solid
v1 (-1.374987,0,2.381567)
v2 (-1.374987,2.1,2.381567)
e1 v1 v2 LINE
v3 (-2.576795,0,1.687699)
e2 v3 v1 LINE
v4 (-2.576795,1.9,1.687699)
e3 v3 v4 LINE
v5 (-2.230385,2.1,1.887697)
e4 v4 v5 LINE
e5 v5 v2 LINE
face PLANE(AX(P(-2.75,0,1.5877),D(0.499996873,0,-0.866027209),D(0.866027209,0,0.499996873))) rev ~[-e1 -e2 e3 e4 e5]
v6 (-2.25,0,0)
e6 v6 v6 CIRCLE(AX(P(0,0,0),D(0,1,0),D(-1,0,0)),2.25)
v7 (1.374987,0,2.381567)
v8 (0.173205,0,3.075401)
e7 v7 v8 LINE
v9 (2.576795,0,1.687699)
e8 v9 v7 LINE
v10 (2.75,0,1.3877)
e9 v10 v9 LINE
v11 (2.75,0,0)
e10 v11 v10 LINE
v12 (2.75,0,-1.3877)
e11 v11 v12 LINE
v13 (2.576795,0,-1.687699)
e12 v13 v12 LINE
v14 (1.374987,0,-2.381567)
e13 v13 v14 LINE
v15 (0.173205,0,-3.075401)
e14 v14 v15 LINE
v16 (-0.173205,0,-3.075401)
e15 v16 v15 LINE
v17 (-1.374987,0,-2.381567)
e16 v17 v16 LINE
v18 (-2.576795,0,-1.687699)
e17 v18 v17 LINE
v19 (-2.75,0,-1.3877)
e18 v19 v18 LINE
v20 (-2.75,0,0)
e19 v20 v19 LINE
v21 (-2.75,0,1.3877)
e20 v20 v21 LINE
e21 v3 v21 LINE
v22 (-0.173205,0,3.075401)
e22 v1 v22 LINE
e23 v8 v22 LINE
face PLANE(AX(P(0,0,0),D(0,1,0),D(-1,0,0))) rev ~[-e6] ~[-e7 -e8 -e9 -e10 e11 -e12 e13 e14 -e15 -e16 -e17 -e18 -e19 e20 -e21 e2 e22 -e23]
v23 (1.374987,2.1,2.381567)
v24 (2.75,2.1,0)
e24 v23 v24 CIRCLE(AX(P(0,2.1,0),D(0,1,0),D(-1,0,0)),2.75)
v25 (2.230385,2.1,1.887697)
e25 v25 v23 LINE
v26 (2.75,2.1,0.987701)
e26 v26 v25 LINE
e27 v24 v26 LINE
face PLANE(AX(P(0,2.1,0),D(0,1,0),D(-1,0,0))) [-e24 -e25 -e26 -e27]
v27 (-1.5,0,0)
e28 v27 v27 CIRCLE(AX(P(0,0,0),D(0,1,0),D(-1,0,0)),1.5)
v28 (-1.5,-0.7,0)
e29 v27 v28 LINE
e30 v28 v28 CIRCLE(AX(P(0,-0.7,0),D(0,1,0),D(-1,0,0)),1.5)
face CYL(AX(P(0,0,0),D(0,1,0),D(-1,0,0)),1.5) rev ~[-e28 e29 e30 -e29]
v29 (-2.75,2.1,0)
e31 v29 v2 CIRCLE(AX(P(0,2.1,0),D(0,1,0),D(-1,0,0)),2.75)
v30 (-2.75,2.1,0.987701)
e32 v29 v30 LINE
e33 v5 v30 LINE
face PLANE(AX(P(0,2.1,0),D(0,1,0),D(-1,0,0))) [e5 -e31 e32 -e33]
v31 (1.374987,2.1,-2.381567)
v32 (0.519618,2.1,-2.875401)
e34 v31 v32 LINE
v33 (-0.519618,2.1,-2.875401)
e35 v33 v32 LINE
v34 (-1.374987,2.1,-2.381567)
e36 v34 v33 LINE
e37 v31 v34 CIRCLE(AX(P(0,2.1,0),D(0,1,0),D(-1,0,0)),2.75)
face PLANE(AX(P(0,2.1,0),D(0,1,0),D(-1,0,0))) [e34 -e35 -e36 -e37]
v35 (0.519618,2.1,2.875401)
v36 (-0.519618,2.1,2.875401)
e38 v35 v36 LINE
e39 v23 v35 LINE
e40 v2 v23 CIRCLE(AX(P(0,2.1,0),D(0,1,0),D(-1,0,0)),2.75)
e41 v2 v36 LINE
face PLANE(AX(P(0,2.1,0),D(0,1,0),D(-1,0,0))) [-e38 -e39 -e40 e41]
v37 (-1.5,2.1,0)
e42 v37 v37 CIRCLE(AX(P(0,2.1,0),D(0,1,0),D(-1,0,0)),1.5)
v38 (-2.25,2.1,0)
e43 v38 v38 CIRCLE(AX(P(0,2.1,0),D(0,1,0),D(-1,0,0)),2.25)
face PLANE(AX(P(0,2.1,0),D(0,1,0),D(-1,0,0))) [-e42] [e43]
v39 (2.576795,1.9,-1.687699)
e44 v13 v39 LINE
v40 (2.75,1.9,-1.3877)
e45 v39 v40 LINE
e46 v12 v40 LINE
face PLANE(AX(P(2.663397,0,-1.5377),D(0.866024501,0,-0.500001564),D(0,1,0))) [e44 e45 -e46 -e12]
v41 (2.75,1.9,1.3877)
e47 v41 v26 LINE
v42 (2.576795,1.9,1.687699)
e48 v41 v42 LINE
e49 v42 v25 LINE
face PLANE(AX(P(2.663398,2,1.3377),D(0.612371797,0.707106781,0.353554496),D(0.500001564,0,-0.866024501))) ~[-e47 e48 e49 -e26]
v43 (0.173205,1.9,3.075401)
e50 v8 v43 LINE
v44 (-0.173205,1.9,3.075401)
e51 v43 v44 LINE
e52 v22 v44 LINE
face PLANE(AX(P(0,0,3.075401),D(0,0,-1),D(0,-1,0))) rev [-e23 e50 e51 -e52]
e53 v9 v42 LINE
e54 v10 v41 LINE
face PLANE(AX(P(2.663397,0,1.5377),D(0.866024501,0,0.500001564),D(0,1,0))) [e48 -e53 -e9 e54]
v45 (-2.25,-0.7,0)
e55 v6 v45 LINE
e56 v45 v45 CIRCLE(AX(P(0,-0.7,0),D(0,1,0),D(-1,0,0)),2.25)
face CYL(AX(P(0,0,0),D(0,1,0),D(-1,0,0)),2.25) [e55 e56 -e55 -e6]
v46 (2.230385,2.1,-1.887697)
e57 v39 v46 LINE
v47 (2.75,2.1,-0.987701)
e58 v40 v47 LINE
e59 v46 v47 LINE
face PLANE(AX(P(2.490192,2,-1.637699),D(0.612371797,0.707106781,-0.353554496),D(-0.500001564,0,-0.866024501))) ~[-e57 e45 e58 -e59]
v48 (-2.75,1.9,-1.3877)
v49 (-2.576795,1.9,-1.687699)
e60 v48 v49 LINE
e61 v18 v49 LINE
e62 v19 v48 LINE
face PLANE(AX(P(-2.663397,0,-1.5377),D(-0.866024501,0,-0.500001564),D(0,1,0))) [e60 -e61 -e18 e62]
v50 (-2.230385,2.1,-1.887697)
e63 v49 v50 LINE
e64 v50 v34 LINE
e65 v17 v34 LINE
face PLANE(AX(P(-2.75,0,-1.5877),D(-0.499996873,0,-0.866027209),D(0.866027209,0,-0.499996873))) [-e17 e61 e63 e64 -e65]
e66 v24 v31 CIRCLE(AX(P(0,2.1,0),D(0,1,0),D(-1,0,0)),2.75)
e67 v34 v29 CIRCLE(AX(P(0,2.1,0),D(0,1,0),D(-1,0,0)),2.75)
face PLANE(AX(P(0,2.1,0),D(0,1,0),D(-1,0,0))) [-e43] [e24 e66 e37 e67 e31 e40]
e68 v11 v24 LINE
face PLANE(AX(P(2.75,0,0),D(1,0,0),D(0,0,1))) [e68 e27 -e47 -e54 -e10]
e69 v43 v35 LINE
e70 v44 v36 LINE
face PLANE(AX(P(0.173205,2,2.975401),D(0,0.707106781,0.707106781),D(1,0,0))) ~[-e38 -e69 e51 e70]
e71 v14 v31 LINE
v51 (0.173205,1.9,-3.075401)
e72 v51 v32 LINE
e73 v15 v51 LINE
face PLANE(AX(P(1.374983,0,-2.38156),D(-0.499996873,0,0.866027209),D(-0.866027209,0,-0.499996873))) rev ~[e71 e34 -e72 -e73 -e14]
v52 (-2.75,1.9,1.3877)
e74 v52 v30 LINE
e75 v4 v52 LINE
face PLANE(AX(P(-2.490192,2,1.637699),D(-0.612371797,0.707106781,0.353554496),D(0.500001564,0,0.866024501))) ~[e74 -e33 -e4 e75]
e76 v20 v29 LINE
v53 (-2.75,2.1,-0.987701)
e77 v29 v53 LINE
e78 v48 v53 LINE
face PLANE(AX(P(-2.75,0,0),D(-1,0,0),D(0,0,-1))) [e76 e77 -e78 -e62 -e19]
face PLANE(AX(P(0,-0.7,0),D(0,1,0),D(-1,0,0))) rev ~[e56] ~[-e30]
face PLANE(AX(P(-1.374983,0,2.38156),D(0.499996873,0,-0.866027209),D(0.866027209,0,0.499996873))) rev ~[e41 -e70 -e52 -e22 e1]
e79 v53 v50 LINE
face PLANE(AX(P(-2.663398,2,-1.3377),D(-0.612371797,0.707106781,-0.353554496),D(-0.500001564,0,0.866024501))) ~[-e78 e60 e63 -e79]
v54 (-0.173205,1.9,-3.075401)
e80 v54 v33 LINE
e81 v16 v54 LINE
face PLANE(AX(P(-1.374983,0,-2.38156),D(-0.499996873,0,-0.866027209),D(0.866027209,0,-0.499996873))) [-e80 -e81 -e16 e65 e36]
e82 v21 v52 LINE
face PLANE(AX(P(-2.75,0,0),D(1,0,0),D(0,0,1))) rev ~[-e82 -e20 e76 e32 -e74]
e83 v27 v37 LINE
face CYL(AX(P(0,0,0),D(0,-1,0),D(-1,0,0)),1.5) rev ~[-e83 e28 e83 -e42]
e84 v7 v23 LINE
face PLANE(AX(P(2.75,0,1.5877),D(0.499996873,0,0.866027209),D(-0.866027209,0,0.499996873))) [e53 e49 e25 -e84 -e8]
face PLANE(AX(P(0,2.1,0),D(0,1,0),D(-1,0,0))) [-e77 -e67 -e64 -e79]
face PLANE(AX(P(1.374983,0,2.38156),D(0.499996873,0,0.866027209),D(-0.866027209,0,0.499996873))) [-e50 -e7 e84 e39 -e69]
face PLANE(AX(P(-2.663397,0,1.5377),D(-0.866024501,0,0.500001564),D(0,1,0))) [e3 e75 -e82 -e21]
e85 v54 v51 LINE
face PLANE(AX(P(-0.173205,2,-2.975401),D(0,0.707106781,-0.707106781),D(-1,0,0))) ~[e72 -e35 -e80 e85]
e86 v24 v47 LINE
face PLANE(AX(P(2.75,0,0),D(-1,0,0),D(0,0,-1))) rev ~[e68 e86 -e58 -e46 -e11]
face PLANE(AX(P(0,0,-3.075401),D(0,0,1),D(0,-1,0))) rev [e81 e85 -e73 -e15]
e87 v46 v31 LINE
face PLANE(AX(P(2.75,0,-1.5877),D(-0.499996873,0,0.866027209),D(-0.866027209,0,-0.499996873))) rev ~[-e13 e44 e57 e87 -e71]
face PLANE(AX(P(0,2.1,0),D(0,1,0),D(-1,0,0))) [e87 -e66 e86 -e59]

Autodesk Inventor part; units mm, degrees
ref_plane "YZ Plane" through (0, 0, 0) normal (1, 0, 0) x (0, 1, 0)
ref_plane "XZ Plane" through (0, 0, 0) normal (0, 1, 0) x (-1, 0, 0)
ref_plane "XY Plane" through (0, 0, 0) normal (0, 0, 1) x (1, 0, 0)
sketch "スケッチ2" plane through (0, 0, 0) normal (0, 1, 0) x (-1, 0, 0)
  circle A0 centre (0, 0) radius 1.5
  circle A1 centre (0, 0) radius 2.25
  circle A2 centre (0, 0) radius 2.75
  line L0 (2.75, 2.75) -> (-2.75, -2.75) construction
  line L1 (1.0066, 4.2082) -> (1.0066, -4.7182) construction
  line L2 (3.3819, 0) -> (-4.1959, 0) construction
  line L3 (-2.75, -1.5877) -> (0, -3.1754)
  line L4 (-2.1903, -1.9109) -> (0.8771, -1.9109) construction
  line L5 (-2.75, 0) -> (-2.75, -1.5877)
  line L6 (0, 3.6036) -> (0, -4.7182) construction
  line L7 (-2.75, 1.5877) -> (0, 3.1754)
  line L8 (-2.75, 0) -> (-2.75, 1.5877)
  line L9 (2.75, -1.5877) -> (0, -3.1754)
  line L10 (2.75, 0) -> (2.75, -1.5877)
  line L11 (2.75, 1.5877) -> (0, 3.1754)
  line L12 (2.75, 0) -> (2.75, 1.5877)
  dimension "d8" = 5.5
  dimension "d6" = 3
  dimension "d7" = 4.5
  dimension "d12" = 30
extrude "押し出し1" add sketch "スケッチ2" against normal blind 0.7 contours A1
extrude "押し出し2" add sketch "スケッチ2" along normal blind 2.1 contours A1 | A2 | L10 L9 A2 | A2 L11 L12 | A2 L7 L11 | L9 L3 A2 | A2 L8 L7 | L3 L5 A2
chamfer "面取り1" distance 0.2 angle 45 6 edges at (2.75, 1.05, -1.5877) (0, 1.05, -3.1754) (-2.75, 1.05, -1.5877) (-2.75, 1.05, 1.5877) (0, 1.05, 3.1754) (2.75, 1.05, 1.5877)
chamfer "面取り2" distance 0.2 angle 45 6 edges at (2.6634, 2.1, -1.5377) (0, 2.1, -3.0754) (-2.6634, 2.1, -1.5377) (-2.6634, 2.1, 1.5377) (0, 2.1, 3.0754) (2.6634, 2.1, 1.5377)
thread "ねじ1" size "M3x0.5" class "6H" standard "ANSI Metric M Profile" full length
properties part number "S3-07-3W" material "ステンレス鋼 AISI 304"
